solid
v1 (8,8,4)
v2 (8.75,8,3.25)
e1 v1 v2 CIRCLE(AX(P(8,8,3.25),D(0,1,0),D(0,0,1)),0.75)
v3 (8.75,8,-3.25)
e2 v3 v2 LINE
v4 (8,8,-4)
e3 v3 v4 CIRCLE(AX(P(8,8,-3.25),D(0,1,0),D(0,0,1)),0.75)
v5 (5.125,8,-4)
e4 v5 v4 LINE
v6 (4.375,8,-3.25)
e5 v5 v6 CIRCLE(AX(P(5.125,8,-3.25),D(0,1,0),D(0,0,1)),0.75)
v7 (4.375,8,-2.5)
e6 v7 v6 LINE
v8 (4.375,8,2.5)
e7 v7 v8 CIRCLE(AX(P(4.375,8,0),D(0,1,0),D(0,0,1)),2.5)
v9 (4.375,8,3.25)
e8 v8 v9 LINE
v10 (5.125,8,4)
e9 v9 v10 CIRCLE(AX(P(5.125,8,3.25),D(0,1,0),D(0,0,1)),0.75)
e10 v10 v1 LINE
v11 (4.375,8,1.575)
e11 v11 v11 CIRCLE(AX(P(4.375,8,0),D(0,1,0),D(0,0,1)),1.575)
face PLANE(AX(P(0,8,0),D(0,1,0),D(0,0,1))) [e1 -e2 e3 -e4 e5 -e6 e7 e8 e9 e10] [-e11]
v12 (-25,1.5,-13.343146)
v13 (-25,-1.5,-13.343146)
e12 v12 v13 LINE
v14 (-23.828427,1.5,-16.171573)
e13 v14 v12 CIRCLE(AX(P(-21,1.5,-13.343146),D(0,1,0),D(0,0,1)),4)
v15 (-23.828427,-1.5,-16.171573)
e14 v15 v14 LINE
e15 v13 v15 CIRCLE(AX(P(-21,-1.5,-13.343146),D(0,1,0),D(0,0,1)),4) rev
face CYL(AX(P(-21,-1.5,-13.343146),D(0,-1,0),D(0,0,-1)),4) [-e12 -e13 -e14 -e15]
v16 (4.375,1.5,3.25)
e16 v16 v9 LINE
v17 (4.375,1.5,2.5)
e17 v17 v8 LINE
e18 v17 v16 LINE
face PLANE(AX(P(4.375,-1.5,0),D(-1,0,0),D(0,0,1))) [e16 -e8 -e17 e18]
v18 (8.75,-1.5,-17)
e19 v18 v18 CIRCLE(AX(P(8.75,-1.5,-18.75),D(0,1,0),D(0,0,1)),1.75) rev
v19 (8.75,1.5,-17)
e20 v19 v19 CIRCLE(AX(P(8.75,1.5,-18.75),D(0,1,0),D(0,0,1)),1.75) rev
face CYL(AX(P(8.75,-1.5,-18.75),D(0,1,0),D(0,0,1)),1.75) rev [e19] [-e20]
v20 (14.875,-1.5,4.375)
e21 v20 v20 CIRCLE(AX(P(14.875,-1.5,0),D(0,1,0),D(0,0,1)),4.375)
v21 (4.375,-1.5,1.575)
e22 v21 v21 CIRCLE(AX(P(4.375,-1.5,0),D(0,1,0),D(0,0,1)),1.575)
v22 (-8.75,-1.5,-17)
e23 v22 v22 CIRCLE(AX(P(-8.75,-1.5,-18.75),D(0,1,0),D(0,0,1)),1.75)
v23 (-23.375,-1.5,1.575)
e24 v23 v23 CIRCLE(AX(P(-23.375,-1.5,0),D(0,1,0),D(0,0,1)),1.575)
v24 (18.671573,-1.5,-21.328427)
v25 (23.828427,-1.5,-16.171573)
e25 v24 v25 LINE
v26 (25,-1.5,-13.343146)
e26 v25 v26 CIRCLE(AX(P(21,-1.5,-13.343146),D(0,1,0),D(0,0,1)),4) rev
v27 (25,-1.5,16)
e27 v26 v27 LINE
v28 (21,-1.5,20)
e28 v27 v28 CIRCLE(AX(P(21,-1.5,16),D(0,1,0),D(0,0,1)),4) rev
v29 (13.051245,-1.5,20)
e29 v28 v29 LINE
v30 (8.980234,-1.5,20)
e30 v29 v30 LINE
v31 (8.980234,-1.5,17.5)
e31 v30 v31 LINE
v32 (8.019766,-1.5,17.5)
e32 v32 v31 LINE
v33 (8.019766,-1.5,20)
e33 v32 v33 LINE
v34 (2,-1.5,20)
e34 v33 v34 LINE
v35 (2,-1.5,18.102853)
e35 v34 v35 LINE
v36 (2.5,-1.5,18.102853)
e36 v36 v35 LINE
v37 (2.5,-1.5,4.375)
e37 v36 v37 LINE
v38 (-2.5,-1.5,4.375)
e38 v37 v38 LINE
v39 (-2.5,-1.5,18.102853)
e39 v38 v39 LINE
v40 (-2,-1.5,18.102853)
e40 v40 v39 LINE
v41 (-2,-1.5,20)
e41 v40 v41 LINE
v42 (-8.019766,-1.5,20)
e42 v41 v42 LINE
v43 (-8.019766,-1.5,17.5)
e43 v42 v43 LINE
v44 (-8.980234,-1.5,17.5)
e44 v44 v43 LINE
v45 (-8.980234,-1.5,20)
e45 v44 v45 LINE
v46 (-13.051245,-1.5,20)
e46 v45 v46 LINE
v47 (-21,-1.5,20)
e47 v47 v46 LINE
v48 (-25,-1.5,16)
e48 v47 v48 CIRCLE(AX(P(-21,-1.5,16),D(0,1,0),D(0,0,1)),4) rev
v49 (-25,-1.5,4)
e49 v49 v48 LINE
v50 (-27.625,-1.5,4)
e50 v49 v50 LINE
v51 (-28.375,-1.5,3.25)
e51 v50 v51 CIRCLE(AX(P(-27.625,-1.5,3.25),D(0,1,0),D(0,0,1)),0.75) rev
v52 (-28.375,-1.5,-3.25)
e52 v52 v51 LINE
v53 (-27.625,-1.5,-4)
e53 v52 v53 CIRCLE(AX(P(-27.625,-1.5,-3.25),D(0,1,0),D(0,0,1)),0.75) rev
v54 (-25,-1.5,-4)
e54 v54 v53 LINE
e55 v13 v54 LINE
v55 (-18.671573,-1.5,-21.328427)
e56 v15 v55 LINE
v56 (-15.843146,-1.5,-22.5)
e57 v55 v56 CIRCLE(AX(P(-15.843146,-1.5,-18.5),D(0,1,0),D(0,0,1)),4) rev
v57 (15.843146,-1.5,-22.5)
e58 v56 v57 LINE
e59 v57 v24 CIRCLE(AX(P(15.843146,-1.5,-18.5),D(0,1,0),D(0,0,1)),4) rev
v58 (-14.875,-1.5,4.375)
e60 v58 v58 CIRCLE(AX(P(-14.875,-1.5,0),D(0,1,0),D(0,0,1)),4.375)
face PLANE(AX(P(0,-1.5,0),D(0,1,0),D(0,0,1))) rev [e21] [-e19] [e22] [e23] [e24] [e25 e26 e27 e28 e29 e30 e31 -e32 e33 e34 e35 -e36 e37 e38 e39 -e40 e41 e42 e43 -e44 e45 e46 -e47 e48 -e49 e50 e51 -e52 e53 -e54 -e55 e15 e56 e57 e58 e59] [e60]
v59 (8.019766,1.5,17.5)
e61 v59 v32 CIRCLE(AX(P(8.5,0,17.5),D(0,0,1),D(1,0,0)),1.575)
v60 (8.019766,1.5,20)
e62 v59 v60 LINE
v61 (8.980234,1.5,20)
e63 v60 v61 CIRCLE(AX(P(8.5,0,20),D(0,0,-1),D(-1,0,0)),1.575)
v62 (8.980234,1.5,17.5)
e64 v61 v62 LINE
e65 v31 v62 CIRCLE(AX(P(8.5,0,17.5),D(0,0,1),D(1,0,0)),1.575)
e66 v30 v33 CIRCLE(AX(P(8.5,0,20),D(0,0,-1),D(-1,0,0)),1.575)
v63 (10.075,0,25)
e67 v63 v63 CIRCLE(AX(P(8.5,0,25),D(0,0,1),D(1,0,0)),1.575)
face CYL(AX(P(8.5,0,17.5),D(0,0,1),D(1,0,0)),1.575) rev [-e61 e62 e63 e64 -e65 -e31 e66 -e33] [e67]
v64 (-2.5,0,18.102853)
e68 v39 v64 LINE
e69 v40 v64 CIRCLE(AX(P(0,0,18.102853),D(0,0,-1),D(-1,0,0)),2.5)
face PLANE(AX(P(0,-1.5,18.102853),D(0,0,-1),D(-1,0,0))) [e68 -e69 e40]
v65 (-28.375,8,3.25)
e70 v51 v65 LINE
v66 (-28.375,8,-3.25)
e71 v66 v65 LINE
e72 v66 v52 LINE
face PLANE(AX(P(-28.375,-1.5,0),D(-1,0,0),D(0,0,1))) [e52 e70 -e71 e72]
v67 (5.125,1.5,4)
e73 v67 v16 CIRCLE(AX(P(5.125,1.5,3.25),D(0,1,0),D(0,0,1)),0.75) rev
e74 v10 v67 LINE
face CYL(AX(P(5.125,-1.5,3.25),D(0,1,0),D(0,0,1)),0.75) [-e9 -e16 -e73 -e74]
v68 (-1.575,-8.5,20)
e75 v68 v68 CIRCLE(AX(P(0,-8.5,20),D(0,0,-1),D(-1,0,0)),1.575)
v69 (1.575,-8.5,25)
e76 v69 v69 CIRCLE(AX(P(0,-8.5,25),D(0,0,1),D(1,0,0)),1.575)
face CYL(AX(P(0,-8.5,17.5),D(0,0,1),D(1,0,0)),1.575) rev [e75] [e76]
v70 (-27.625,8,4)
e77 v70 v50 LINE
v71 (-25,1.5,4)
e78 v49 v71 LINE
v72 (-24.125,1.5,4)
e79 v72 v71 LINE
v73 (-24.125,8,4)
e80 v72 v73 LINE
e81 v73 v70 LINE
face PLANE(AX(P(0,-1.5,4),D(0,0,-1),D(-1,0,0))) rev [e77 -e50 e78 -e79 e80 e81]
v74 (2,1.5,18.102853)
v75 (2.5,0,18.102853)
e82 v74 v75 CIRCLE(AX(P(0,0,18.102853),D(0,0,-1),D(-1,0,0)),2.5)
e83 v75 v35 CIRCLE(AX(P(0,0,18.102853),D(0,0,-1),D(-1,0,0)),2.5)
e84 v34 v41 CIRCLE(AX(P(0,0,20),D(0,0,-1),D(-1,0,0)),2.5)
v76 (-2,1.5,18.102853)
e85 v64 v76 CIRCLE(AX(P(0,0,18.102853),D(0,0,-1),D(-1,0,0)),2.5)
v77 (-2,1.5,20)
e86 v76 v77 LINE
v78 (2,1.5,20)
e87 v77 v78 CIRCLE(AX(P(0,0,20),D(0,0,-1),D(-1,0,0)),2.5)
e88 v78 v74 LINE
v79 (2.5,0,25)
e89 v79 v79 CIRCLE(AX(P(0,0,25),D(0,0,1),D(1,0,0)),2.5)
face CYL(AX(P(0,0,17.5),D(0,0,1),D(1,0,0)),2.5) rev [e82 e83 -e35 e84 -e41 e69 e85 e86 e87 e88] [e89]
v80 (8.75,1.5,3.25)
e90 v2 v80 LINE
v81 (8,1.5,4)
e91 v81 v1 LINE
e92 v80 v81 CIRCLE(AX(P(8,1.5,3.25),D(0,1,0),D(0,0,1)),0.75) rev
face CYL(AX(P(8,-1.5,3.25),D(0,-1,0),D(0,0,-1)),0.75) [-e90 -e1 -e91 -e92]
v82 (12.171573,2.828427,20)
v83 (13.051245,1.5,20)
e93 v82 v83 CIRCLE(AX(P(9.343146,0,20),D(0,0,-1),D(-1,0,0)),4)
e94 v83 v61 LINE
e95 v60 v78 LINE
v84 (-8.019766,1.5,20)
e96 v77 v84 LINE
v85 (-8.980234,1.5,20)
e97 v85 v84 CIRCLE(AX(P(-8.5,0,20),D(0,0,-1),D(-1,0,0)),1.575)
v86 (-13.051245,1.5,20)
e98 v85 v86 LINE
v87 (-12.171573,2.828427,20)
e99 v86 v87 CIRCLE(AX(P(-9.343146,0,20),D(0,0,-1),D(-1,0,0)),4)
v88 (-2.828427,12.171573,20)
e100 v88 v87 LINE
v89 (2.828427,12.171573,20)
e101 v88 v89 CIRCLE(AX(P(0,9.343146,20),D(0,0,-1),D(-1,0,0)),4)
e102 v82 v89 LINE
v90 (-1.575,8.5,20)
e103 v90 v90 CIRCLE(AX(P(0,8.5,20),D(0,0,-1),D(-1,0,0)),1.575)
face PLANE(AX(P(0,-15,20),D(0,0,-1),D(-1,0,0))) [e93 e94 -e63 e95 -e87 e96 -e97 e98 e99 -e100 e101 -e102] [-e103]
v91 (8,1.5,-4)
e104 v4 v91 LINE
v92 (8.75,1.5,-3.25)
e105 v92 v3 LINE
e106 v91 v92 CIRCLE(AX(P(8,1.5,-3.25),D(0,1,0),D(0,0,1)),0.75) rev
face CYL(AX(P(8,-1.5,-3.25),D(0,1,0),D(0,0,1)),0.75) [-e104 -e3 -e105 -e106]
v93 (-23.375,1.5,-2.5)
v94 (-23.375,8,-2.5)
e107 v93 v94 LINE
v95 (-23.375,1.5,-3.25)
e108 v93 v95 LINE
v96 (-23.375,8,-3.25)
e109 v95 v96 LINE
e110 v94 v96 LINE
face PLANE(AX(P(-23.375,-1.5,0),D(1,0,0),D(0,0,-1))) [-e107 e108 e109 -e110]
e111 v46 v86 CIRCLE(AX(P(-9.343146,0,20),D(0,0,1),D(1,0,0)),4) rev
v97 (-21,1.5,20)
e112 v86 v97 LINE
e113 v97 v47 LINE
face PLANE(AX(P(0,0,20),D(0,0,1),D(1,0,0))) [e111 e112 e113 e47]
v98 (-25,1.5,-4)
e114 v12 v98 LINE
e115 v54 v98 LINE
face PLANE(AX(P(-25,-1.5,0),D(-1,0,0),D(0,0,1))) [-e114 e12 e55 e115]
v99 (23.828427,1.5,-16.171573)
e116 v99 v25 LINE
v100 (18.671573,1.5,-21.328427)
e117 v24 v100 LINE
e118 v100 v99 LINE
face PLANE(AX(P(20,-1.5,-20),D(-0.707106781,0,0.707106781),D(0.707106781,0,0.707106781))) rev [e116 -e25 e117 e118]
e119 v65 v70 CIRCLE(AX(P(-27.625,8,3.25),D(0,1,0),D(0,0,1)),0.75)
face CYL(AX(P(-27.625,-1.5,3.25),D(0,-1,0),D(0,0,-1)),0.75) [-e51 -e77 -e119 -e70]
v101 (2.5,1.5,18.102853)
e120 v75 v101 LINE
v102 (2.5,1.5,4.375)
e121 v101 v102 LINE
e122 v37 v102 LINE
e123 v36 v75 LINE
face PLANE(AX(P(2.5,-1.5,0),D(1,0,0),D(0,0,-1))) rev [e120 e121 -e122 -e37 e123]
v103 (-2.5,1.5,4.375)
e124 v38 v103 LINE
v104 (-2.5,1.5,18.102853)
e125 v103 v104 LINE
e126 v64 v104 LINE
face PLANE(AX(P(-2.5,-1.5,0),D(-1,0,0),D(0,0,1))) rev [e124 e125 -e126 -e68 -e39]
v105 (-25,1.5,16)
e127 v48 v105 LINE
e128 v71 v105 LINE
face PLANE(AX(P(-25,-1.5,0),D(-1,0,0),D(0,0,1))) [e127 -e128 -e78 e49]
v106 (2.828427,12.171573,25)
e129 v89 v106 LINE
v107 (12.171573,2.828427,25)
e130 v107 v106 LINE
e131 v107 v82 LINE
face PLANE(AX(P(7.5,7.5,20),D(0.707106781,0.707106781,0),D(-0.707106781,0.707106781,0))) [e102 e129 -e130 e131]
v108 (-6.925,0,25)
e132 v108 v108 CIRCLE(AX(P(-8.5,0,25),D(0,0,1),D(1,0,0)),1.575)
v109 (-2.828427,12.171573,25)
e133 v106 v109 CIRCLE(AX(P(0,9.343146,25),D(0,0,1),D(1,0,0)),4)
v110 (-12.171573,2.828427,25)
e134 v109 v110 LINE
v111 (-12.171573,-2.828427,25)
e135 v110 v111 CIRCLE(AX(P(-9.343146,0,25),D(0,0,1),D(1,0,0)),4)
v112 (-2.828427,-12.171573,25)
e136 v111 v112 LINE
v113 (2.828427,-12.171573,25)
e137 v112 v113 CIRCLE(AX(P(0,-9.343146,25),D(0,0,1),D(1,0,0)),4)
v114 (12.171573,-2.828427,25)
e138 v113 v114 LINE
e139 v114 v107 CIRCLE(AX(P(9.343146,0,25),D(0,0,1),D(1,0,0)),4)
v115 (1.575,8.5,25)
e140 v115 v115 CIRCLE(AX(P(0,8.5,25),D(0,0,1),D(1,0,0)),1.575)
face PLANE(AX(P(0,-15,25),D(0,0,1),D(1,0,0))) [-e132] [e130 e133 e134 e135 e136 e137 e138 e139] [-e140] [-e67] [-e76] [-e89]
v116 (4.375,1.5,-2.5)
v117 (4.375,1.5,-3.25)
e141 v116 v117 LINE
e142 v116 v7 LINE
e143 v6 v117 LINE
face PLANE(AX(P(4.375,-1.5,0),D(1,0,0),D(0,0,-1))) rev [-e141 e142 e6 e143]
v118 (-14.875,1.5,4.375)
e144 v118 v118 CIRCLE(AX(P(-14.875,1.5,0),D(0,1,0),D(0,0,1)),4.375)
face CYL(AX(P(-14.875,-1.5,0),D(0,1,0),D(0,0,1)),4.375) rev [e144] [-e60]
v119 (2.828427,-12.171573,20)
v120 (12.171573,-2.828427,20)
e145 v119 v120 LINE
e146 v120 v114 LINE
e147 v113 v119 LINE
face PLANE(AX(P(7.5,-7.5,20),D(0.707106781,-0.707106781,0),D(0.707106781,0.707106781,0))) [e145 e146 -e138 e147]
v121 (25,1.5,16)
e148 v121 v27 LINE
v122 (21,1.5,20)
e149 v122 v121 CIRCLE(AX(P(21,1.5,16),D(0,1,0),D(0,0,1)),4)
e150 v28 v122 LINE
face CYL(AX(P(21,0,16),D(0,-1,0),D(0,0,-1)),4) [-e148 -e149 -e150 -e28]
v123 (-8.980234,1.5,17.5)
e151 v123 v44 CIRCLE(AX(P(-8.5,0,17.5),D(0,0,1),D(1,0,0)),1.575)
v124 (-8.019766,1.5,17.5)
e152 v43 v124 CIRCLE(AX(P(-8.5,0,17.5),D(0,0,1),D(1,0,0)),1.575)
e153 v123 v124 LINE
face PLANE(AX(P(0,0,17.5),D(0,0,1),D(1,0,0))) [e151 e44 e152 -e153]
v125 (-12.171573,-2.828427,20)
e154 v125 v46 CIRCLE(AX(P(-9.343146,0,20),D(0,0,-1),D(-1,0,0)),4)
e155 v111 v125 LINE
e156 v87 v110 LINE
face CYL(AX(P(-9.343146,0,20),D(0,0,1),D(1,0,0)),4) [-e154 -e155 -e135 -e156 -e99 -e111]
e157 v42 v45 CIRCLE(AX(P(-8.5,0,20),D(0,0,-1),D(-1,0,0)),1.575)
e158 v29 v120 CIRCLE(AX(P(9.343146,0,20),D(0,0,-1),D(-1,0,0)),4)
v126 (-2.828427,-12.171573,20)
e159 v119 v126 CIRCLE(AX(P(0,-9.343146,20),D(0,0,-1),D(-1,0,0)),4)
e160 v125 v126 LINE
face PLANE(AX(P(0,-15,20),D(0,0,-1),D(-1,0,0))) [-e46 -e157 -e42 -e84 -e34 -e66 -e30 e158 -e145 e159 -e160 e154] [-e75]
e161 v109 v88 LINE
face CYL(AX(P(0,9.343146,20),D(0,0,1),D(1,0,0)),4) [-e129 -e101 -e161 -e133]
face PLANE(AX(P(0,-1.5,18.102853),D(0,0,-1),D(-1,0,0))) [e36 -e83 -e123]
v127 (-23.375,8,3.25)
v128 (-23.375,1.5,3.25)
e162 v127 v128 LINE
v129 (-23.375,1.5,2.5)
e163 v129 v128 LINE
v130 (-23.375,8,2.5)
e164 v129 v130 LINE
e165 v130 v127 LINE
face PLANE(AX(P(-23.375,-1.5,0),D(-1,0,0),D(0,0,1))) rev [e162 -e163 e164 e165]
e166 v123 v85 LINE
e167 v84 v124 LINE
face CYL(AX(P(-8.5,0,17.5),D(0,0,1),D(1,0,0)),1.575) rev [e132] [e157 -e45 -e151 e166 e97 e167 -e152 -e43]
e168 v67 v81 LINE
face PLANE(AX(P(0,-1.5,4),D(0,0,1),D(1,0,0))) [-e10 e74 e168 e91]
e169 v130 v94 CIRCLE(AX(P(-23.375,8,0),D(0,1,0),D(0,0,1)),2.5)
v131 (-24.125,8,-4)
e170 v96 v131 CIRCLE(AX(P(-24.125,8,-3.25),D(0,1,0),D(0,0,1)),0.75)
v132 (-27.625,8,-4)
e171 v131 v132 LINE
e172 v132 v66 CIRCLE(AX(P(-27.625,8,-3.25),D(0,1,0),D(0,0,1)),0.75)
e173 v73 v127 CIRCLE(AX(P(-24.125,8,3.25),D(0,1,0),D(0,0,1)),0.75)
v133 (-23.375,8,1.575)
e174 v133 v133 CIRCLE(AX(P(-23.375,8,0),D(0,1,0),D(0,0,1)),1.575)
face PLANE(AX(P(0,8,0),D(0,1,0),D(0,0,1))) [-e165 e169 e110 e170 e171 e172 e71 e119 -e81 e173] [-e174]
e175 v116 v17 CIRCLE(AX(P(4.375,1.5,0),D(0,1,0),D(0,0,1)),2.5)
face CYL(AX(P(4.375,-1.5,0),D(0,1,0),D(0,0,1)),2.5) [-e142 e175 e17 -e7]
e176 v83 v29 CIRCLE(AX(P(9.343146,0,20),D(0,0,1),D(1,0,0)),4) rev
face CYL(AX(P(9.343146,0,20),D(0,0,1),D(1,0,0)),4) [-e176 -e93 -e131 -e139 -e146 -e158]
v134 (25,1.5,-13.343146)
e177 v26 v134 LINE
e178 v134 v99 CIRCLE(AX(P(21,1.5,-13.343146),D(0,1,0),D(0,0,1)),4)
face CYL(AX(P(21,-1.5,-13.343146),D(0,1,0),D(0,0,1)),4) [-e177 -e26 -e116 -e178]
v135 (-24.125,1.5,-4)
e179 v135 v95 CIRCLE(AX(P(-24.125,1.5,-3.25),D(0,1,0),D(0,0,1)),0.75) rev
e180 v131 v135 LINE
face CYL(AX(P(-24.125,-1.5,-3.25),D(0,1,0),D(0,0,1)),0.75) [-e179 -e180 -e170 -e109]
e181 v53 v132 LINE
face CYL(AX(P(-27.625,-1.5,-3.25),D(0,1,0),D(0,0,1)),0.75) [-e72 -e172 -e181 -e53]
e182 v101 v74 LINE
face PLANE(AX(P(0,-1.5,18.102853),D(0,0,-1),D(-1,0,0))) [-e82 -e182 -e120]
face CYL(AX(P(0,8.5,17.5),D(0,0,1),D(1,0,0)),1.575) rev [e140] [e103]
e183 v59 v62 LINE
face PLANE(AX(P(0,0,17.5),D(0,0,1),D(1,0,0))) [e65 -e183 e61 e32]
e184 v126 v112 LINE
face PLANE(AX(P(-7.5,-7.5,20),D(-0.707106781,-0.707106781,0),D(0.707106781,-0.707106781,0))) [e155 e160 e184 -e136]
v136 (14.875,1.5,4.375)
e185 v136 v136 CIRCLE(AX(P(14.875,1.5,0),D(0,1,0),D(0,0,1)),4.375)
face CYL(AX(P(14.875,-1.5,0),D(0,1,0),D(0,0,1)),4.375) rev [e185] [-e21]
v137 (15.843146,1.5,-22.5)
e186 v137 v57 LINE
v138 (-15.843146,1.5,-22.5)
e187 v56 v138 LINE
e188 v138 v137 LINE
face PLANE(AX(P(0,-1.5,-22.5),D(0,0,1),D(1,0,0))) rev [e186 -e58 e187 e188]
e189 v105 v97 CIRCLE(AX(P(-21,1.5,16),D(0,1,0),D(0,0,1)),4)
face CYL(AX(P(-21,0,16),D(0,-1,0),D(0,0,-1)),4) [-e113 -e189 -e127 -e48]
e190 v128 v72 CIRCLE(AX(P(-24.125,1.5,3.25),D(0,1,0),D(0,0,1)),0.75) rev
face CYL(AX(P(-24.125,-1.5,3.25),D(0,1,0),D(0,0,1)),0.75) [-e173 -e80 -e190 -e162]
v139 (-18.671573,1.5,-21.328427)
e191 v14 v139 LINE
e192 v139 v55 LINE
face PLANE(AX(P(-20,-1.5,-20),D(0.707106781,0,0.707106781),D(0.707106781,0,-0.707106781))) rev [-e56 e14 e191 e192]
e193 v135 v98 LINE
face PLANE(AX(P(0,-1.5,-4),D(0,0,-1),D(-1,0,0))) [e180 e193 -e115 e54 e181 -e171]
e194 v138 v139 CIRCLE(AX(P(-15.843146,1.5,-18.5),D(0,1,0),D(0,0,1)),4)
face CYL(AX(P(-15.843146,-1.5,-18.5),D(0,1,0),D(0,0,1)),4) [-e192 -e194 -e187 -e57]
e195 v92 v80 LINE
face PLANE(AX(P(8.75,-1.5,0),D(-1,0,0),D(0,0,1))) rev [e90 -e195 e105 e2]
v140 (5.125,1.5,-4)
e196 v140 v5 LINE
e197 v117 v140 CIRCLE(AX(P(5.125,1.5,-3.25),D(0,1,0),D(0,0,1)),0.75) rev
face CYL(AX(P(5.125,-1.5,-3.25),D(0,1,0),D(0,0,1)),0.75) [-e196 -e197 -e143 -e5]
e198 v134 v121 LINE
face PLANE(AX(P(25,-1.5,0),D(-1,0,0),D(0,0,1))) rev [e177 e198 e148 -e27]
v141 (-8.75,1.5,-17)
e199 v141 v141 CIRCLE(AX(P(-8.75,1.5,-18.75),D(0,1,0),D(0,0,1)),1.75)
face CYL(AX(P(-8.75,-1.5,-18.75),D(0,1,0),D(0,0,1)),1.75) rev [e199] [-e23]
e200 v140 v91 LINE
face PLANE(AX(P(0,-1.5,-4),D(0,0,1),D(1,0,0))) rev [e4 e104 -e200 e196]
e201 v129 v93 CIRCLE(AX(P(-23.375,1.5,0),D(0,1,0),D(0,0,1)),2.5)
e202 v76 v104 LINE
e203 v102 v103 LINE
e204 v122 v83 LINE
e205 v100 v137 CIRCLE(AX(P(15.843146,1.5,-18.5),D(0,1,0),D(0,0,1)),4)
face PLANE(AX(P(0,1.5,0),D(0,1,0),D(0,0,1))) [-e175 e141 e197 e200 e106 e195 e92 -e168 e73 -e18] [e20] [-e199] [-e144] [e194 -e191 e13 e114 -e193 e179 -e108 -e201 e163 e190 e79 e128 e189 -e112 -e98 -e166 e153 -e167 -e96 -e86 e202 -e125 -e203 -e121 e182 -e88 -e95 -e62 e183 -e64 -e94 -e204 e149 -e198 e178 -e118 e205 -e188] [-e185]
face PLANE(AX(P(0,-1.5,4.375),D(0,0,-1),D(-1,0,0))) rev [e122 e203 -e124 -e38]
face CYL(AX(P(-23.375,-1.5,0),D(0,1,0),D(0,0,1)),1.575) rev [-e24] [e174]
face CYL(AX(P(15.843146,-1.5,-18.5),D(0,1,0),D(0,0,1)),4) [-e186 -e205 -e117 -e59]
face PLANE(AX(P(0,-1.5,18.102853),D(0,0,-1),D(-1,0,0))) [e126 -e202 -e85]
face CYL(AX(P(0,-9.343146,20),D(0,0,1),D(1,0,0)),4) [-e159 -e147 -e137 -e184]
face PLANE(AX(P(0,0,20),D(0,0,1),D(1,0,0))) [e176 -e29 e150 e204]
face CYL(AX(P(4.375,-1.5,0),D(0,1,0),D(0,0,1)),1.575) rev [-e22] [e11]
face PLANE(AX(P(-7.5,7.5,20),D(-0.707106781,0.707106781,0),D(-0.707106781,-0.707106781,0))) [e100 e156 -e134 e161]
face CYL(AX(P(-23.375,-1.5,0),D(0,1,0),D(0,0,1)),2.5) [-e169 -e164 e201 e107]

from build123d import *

# Parameters (mm, degrees)
BOSS_EXTRUDE1_DEPTH      = 1.5
BOSS_EXTRUDE1_DEPTH_BACK = 1.5
SKETCH1_W                = 5
SKETCH1_H                = 13.727853371
SKETCH1_R                = 4.375
SKETCH1_R_2              = 1.75
BOSS_EXTRUDE2_DEPTH      = 15
BOSS_EXTRUDE2_DEPTH_BACK = 15
SKETCH2_R                = 1.575
SKETCH2_R_2              = 2.5
CUT_EXTRUDE1_DEPTH       = 7.5
CUT_EXTRUDE2_DEPTH       = 5
BOSS_EXTRUDE3_DEPTH      = 8
BOSS_EXTRUDE3_DEPTH_BACK = 1.5
SKETCH1_4_R              = 1.575
FILLET1_R                = 4
FILLET2_R                = 0.75


with BuildPart() as part:
    # Sketch1 → Boss-Extrude1 (new, two sides: drawn at the far end of the back side and taken through both)
    with BuildSketch(Plane(origin=(0, 0, 0), x_dir=(1, 0, 0), z_dir=(0, 1, 0)).offset(-BOSS_EXTRUDE1_DEPTH_BACK)):
        with BuildLine():
            ThreePointArc((-23.375, 2.5), (-21.607233047, 1.767766953), (-20.875, 0))
            ThreePointArc((-20.875, 0), (-21.607233047, -1.767766953), (-23.375, -2.5))
            Line((-23.375, -2.5), (-23.375, -4))
            Line((-23.375, -4), (-25, -4))
            Line((-25, -4), (-25, -20))
            Line((-25, -20), (25, -20))
            Line((25, -20), (25, 15))
            Line((25, 15), (17.5, 22.5))
            Line((17.5, 22.5), (-17.5, 22.5))
            Line((-17.5, 22.5), (-25, 15))
            Line((-25, 15), (-25, 4))
            Line((-25, 4), (-23.375, 4))
            Line((-23.375, 4), (-23.375, 2.5))
        make_face()
        with Locations((0, -11.238926686)):
            Rectangle(SKETCH1_W, SKETCH1_H, mode=Mode.SUBTRACT)
        with BuildLine():
            ThreePointArc((-10.5, 0), (-14.875, -4.375), (-19.25, 0))
            ThreePointArc((-19.25, 0), (-17.968592168, 3.093592168), (-14.875, 4.375))
            ThreePointArc((-14.875, 4.375), (-11.781407832, 3.093592168), (-10.5, 0))
        make_face(mode=Mode.SUBTRACT)
        with BuildLine():
            ThreePointArc((4.375, -2.5), (2.607233047, -1.767766953), (1.875, 0))
            ThreePointArc((1.875, 0), (2.607233047, 1.767766953), (4.375, 2.5))
            Line((4.375, 2.5), (4.375, 4))
            Line((4.375, 4), (8.75, 4))
            Line((8.75, 4), (8.75, 0))
            Line((8.75, 0), (8.75, -4))
            Line((8.75, -4), (4.375, -4))
            Line((4.375, -4), (4.375, -2.5))
        make_face(mode=Mode.SUBTRACT)
        with Locations(Location((14.875, 0, 0), (0, 0, 270))):
            Circle(SKETCH1_R, mode=Mode.SUBTRACT)
        with Locations(Location((-8.75, 18.75, 0), (0, 0, 270))):
            Circle(SKETCH1_R_2, mode=Mode.SUBTRACT)
        with Locations(Location((8.75, 18.75, 0), (0, 0, 270))):
            Circle(SKETCH1_R_2, mode=Mode.SUBTRACT)
    extrude(amount=BOSS_EXTRUDE1_DEPTH + BOSS_EXTRUDE1_DEPTH_BACK)

    # Sketch1<3> → Boss-Extrude2 (add, two sides: drawn at the far end of the back side and taken through both)
    with BuildSketch(Plane(origin=(0, 0, 0), x_dir=(1, 0, 0), z_dir=(0, 1, 0)).offset(-BOSS_EXTRUDE2_DEPTH_BACK)):
        Polygon((0, -20), (-25, -20), (-25, -25), (25, -25), (25, -20), align=None)
    extrude(amount=BOSS_EXTRUDE2_DEPTH + BOSS_EXTRUDE2_DEPTH_BACK)

    # Sketch2 → Cut-Extrude1 (cut)
    with BuildSketch(Plane.XY.offset(25)):
        with Locations((-8.5, 0)):
            Circle(SKETCH2_R)
        Circle(SKETCH2_R_2)
        with Locations((0, 8.5)):
            Circle(SKETCH2_R)
        with Locations((8.5, 0)):
            Circle(SKETCH2_R)
        with Locations((0, -8.5)):
            Circle(SKETCH2_R)
    extrude(amount=-CUT_EXTRUDE1_DEPTH, mode=Mode.SUBTRACT)

    # Sketch2<3> → Cut-Extrude2 (cut)
    with BuildSketch(Plane.XY.offset(25)):
        Polygon((-25, 0), (-15, 0), (0, 15), (-25, 15), align=None)
        Polygon((25, 15), (0, 15), (15, 0), (0, -15), (25, -15), align=None)
        Polygon((0, -15), (-15, 0), (-25, 0), (-25, -15), align=None)
    extrude(amount=-CUT_EXTRUDE2_DEPTH, mode=Mode.SUBTRACT)

    # Sketch1<4> → Boss-Extrude3 (add, two sides: drawn at the far end of the back side and taken through both)
    # profile 1 of 2: a face of its own
    with BuildSketch(Plane(origin=(0, 0, 0), x_dir=(1, 0, 0), z_dir=(0, 1, 0)).offset(-BOSS_EXTRUDE3_DEPTH_BACK)):
        with BuildLine():
            ThreePointArc((4.375, 2.5), (1.875, 0), (4.375, -2.5))
            Line((4.375, -2.5), (4.375, -4))
            Line((4.375, -4), (8.75, -4))
            Line((8.75, -4), (8.75, 4))
            Line((8.75, 4), (4.375, 4))
            Line((4.375, 4), (4.375, 2.5))
        make_face()
        with Locations(Location((4.375, 0, 0), (0, 0, 270))):
            Circle(SKETCH1_4_R, mode=Mode.SUBTRACT)
    # profile 2 of 2: a face of its own
    with BuildSketch(Plane(origin=(0, 0, 0), x_dir=(1, 0, 0), z_dir=(0, 1, 0)).offset(-BOSS_EXTRUDE3_DEPTH_BACK)):
        with BuildLine():
            ThreePointArc((-23.375, -2.5), (-20.875, 0), (-23.375, 2.5))
            Line((-23.375, 2.5), (-23.375, 4))
            Line((-23.375, 4), (-28.375, 4))
            Line((-28.375, 4), (-28.375, -4))
            Line((-28.375, -4), (-23.375, -4))
            Line((-23.375, -4), (-23.375, -2.5))
        make_face()
        with Locations(Location((-23.375, 0, 0), (0, 0, 270))):
            Circle(SKETCH1_4_R, mode=Mode.SUBTRACT)
    extrude(amount=BOSS_EXTRUDE3_DEPTH + BOSS_EXTRUDE3_DEPTH_BACK)

    # Fillet1
    # the kernel refuses this fillet: 4 mm, written as the material it takes off along each edge
    with BuildSketch(Plane(origin=(15, 0, 35), x_dir=(-0.7071067811865535, -0.7071067811865416, 0), z_dir=(0, 0, -1))) as fillet1_piece_1:
        with BuildLine():
            CenterArc((FILLET1_R, FILLET1_R), FILLET1_R, 180, 90)
            Line((0, FILLET1_R), (0, 0))
            Line((0, 0), (FILLET1_R, 0))
        make_face()
    extrude(amount=15, mode=Mode.SUBTRACT)
    with BuildSketch(Plane(origin=(0, 15, 35), x_dir=(0.7071067811865505, -0.7071067811865446, 0), z_dir=(0, 0, -1))) as fillet1_piece_2:
        with BuildLine():
            CenterArc((FILLET1_R, FILLET1_R), FILLET1_R, 180, 90)
            Line((0, FILLET1_R), (0, 0))
            Line((0, 0), (FILLET1_R, 0))
        make_face()
    extrude(amount=25, mode=Mode.SUBTRACT)
    with BuildSketch(Plane(origin=(25, -11.5, 20), x_dir=(0, 0, -1), z_dir=(0, 1, 0)), Plane(origin=(-25, -11.5, 20), x_dir=(1, 0, 0), z_dir=(0, 1, 0))) as fillet1_piece_3:
        with BuildLine():
            CenterArc((FILLET1_R, FILLET1_R), FILLET1_R, 180, 90)
            Line((0, FILLET1_R), (0, 0))
            Line((0, 0), (FILLET1_R, 0))
        make_face()
    extrude(amount=23, mode=Mode.SUBTRACT)
    with BuildSketch(Plane(origin=(0, -15, 35), x_dir=(0.7071067811865533, 0.7071067811865418, 0), z_dir=(0, 0, -1))) as fillet1_piece_4:
        with BuildLine():
            CenterArc((FILLET1_R, -FILLET1_R), FILLET1_R, 90, 90)
            Line((0, -FILLET1_R), (0, 0))
            Line((0, 0), (FILLET1_R, 0))
        make_face()
    extrude(amount=25, mode=Mode.SUBTRACT)
    with BuildSketch(Plane(origin=(-15, 0, 35), x_dir=(0.7071067811865416, -0.7071067811865536, 0), z_dir=(0, 0, -1))) as fillet1_piece_5:
        with BuildLine():
            CenterArc((FILLET1_R, -FILLET1_R), FILLET1_R, 90, 90)
            Line((0, -FILLET1_R), (0, 0))
            Line((0, 0), (FILLET1_R, 0))
        make_face()
    extrude(amount=15, mode=Mode.SUBTRACT)
    with BuildSketch(Plane(origin=(-25, -5.642135624, -15), x_dir=(0, 0, 1), z_dir=(0, 1, 0)), Plane(origin=(-17.5, -5.642135624, -22.5), x_dir=(-0.7071067811865465, 0, 0.7071067811865487), z_dir=(0, 1, 0)), Plane(origin=(25, 5.642135624, -15), x_dir=(0, 0, 1), z_dir=(0, -1, 0))) as fillet1_piece_6:
        with BuildLine():
            CenterArc((FILLET1_R * 0.414213562373, FILLET1_R), FILLET1_R, 225, 45)
            Line((-FILLET1_R * 0.292893218813, FILLET1_R * 0.292893218813), (0, 0))
            Line((0, 0), (FILLET1_R * 0.414213562373, 0))
        make_face()
    extrude(amount=11.284271247, mode=Mode.SUBTRACT)
    with BuildSketch(Plane(origin=(17.5, -5.642135624, -22.5), x_dir=(0.7071067811865454, 0, 0.7071067811865497), z_dir=(0, 1, 0))) as fillet1_piece_7:
        with BuildLine():
            CenterArc((FILLET1_R * 0.414213562373, -FILLET1_R), FILLET1_R, 90, 45)
            Line((-FILLET1_R * 0.292893218813, -FILLET1_R * 0.292893218813), (0, 0))
            Line((0, 0), (FILLET1_R * 0.414213562373, 0))
        make_face()
    extrude(amount=11.284271247, mode=Mode.SUBTRACT)

    # Fillet2
    fillet2_edges = [part.edges().sort_by_distance(p)[0] for p in [
        (8.75, 4.75, -4),
        (8.75, 4.75, 4),
        (4.375, 4.75, 4),
        (4.375, 4.75, -4),
        (-28.375, 3.25, 4),
        (-28.375, 3.25, -4),
        (-23.375, 4.75, -4),
        (-23.375, 4.75, 4),
    ]]
    fillet(fillet2_edges, radius=FILLET2_R)


solid = part.part
